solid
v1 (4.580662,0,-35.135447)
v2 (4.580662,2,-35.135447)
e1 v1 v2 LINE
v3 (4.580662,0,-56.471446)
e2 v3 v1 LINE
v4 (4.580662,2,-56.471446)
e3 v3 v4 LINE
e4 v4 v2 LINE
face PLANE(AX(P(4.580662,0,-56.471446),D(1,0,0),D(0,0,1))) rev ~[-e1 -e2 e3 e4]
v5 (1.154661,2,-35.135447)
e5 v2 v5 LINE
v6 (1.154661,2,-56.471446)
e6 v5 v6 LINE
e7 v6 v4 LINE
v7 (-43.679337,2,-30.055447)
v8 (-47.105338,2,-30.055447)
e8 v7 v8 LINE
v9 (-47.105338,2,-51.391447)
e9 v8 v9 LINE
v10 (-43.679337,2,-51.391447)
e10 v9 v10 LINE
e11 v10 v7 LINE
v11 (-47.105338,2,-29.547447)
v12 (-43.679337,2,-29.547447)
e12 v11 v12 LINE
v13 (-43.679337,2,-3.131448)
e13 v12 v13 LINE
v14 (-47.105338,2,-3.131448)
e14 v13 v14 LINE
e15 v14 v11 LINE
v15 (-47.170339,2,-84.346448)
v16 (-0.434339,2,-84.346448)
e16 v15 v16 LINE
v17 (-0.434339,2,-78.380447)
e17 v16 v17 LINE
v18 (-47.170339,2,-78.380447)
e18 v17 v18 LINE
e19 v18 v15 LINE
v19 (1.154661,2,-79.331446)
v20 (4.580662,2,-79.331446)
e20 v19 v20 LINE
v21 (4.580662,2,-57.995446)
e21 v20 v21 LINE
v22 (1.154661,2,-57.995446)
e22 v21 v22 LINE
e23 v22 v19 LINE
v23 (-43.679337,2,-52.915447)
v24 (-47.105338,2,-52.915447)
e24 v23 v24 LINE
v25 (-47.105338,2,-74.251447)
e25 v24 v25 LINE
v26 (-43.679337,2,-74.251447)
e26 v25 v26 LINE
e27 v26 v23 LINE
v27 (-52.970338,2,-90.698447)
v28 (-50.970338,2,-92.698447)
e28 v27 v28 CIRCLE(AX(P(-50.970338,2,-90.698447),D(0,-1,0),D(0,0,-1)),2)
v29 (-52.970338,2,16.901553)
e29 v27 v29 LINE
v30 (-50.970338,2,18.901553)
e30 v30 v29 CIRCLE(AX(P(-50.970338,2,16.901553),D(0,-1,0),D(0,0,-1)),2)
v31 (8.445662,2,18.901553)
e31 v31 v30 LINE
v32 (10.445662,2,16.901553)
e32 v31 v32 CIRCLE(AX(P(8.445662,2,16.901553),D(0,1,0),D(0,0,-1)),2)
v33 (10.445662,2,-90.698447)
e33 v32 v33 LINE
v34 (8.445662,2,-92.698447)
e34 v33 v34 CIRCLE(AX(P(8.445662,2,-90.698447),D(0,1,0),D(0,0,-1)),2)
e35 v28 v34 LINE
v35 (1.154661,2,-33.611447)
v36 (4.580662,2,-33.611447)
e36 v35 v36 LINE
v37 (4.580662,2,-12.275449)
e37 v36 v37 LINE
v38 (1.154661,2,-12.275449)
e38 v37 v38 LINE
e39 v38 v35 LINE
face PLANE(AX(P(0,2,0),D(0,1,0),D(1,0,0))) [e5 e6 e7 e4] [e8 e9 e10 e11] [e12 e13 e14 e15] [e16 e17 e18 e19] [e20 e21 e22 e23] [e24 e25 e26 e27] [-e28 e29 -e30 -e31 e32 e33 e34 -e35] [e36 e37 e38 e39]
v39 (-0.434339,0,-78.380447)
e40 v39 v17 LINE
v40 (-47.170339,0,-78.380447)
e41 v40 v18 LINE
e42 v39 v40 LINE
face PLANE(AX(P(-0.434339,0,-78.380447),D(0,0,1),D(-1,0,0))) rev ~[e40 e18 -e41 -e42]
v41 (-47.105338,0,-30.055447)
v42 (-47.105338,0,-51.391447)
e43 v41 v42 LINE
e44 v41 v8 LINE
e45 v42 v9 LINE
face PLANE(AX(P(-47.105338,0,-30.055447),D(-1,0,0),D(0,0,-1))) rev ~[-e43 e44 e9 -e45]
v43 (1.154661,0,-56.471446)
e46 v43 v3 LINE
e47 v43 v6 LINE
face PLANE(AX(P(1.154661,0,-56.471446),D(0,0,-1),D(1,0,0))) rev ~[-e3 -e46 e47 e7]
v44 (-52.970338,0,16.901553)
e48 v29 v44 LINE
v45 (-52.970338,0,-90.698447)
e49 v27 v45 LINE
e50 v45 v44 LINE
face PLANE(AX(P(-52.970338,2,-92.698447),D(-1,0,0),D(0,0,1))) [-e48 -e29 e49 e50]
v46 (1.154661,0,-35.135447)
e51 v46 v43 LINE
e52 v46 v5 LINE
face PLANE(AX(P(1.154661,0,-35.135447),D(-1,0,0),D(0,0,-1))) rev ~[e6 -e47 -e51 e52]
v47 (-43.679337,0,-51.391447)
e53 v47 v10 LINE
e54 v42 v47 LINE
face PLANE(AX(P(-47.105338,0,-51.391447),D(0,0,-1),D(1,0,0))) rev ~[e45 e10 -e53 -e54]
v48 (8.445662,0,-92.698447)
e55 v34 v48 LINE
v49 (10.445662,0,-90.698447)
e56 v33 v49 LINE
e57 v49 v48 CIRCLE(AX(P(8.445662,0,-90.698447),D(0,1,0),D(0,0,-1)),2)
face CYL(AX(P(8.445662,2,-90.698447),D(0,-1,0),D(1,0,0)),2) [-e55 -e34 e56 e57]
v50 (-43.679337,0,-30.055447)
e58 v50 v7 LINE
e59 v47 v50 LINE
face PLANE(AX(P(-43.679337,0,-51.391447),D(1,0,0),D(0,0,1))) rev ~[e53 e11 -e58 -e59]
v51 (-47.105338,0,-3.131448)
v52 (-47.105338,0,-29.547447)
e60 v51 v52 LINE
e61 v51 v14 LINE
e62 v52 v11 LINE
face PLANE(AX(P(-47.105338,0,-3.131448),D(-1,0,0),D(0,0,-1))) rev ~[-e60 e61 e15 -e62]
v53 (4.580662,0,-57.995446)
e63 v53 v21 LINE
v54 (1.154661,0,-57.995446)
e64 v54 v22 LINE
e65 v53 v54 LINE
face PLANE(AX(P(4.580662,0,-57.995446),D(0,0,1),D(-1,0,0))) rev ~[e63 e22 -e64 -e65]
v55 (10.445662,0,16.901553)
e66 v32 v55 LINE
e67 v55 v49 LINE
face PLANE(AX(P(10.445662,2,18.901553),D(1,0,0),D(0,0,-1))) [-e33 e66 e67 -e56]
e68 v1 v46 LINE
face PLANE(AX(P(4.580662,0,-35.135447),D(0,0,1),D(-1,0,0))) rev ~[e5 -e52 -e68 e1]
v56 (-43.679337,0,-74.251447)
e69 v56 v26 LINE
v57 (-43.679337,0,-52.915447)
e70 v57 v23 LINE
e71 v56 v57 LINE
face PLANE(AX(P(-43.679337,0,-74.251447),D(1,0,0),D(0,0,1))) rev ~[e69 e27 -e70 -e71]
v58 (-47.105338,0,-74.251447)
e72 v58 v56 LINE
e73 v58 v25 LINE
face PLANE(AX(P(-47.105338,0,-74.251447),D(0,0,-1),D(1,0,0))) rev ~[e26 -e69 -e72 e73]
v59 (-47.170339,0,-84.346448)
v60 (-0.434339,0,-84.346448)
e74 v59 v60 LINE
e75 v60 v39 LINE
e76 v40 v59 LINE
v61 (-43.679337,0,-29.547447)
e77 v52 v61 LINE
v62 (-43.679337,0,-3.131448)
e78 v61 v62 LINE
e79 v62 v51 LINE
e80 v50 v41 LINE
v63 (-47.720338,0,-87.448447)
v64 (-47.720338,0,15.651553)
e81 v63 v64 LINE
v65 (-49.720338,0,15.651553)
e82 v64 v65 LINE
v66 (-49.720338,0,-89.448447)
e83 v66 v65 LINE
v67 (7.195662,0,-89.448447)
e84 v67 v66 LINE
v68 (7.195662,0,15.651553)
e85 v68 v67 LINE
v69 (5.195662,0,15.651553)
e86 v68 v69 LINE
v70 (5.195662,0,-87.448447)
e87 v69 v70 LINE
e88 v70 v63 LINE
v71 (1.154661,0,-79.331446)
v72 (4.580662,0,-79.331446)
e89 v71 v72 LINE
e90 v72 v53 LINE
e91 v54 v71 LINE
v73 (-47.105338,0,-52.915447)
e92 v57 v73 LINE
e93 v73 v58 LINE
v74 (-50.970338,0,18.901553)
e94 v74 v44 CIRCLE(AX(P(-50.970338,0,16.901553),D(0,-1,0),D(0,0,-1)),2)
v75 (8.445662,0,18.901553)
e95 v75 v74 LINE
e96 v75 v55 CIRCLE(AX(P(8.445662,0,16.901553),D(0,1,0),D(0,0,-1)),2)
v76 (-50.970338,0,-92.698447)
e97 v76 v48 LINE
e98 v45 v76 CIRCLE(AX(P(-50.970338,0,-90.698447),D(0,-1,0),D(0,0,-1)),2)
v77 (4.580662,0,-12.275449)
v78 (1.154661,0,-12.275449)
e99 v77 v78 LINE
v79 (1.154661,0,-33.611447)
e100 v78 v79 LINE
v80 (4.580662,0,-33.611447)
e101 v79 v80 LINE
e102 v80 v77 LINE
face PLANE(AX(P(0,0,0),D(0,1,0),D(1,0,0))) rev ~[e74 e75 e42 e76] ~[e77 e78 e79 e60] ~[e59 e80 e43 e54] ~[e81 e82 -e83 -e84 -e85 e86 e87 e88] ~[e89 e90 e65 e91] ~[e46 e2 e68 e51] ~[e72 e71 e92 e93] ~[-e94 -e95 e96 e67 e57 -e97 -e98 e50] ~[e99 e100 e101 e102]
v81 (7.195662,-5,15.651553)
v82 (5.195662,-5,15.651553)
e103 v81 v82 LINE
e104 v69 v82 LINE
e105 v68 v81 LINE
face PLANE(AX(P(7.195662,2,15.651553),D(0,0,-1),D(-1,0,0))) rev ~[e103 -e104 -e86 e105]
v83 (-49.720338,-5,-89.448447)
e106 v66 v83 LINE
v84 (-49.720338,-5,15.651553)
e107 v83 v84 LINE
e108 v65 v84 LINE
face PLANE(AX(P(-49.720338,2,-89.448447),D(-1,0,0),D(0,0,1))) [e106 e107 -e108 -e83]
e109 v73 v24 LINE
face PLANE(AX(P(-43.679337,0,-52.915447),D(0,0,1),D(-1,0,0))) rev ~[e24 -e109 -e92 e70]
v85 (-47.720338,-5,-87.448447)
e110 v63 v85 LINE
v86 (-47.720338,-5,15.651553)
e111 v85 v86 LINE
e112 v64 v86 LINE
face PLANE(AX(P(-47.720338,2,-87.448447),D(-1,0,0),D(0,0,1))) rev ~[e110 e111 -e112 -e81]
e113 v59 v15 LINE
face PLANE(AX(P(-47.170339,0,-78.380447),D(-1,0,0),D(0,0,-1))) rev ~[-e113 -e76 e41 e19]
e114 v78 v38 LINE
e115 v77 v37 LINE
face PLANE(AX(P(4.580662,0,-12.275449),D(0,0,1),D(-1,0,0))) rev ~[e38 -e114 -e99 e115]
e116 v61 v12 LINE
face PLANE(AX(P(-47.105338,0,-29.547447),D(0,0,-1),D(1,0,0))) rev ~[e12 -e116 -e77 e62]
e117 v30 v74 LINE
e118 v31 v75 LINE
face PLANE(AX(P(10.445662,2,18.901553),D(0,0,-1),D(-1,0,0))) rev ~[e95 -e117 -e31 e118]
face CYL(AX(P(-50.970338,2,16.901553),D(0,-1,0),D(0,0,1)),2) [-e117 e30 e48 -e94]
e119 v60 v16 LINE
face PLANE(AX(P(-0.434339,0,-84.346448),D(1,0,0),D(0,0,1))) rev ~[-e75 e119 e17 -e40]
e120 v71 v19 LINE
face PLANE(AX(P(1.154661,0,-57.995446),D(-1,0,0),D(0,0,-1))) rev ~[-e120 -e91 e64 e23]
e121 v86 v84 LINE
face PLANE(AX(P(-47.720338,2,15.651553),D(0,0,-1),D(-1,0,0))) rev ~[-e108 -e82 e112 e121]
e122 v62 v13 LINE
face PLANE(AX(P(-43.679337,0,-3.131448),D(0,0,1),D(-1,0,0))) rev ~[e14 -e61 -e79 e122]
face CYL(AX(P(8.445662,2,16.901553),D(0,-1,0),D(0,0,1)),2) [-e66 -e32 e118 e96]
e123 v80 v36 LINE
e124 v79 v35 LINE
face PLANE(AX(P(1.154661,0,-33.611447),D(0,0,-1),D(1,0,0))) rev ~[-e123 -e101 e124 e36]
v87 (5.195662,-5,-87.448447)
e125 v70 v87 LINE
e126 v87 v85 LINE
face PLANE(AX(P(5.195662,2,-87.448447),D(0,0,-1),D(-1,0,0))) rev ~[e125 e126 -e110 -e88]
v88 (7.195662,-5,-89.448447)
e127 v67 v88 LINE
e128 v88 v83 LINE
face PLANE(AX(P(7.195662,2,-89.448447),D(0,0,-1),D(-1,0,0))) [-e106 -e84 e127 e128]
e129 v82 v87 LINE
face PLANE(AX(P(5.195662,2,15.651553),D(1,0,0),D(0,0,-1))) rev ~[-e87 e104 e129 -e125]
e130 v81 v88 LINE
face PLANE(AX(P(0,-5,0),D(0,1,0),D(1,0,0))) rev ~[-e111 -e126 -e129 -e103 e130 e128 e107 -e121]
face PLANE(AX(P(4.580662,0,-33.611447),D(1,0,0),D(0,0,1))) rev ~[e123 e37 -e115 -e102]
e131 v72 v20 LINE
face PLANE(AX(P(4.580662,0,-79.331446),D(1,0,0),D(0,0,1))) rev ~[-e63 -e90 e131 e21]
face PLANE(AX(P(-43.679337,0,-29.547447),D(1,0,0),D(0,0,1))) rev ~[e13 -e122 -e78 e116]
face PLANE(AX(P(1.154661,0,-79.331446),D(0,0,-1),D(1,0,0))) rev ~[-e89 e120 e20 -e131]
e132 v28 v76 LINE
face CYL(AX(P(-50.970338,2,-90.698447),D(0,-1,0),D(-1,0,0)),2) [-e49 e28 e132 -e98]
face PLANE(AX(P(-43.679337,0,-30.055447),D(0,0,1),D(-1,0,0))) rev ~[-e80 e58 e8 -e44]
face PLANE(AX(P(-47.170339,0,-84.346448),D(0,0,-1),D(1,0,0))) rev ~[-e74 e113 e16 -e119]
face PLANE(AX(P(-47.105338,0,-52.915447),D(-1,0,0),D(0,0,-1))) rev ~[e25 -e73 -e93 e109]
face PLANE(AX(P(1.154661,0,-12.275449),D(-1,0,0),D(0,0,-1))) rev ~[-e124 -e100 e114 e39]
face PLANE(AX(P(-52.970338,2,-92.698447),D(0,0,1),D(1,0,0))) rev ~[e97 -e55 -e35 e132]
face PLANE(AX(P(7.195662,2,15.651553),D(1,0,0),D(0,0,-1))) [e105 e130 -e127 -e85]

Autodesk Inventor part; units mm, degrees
ref_plane "YZ Plane" through (0, 0, 0) normal (1, 0, 0) x (0, 1, 0)
ref_plane "XZ Plane" through (0, 0, 0) normal (0, 1, 0) x (-1, 0, 0)
ref_plane "XY Plane" through (0, 0, 0) normal (0, 0, 1) x (1, 0, 0)
sketch "Náčrt1" plane through (0, 0, 0) normal (0, 1, 0) x (-1, 0, 0)
  line L0 (-6.677663, 17.076554) -> (49.20234, 17.076554)
  line L1 (-9.217661, 14.536556) -> (-9.217661, -88.33345)
  line L2 (-6.677663, -90.873447) -> (49.20234, -90.873447)
  line L3 (51.742337, 14.536556) -> (51.742337, -88.33345)
  line L4 (47.105338, -3.131448) -> (47.105338, -74.251447)
  line L5 (43.679337, -3.131448) -> (47.105338, -3.131448)
  line L6 (43.679337, -29.547447) -> (43.679337, -3.131448)
  line L7 (43.679337, -29.547447) -> (47.105338, -29.547447)
  line L8 (43.679337, -30.055447) -> (47.105338, -30.055447)
  line L9 (43.679337, -51.391447) -> (43.679337, -30.055447)
  line L10 (47.105338, -51.391447) -> (43.679337, -51.391447)
  line L11 (43.679337, -52.915447) -> (47.105338, -52.915447)
  line L12 (43.679337, -74.251447) -> (43.679337, -52.915447)
  line L13 (47.105338, -74.251447) -> (43.679337, -74.251447)
  line L14 (0.434339, -78.380447) -> (47.170339, -78.380447)
  line L15 (47.170339, -84.346448) -> (47.170339, -78.380447)
  line L16 (47.170339, -84.346448) -> (0.434339, -84.346448)
  line L17 (0.434339, -84.346448) -> (0.434339, -78.380447)
  line L18 (-1.154661, -57.995446) -> (-1.154661, -79.331446)
  line L19 (-4.580662, -79.331446) -> (-4.580662, -12.275449)
  line L20 (-1.154661, -79.331446) -> (-4.580662, -79.331446)
  line L21 (-4.580662, -57.995446) -> (-1.154661, -57.995446)
  line L22 (-1.154661, -56.471446) -> (-4.580662, -56.471446)
  line L23 (-1.154661, -35.135447) -> (-1.154661, -56.471446)
  line L24 (-4.580662, -35.135447) -> (-1.154661, -35.135447)
  line L25 (-1.154661, -33.611447) -> (-4.580662, -33.611447)
  line L26 (-1.154661, -12.275449) -> (-1.154661, -33.611447)
  line L27 (-4.580662, -12.275449) -> (-1.154661, -12.275449)
  circle A0 centre (-6.686866, -88.348377) radius 2.522363
  circle A1 centre (49.198008, -88.332369) radius 2.54409
  circle A2 centre (49.211542, 14.551484) radius 2.522363
  circle A3 centre (-6.692632, 14.545779) radius 2.522319
  line L28 (51.742337, 17.076554) -> (-9.217661, 17.076554)
  line L29 (-9.217661, 17.076554) -> (-9.217661, -90.873447)
  line L30 (-9.217661, -90.873447) -> (51.742337, -90.873447)
  line L31 (51.742337, -90.873447) -> (51.742337, 17.076554)
  line L32 (-1.154661, -12.275449) -> (-4.580662, -12.275449)
  line L33 (-4.580662, -12.275449) -> (-4.580662, -33.611447)
  line L34 (-4.580662, -33.611447) -> (-1.154661, -33.611447)
  line L35 (-1.154661, -33.611447) -> (-1.154661, -12.275449)
  line L36 (-4.580662, -35.135447) -> (-1.154661, -35.135447)
  line L37 (-1.154661, -35.135447) -> (-1.154661, -56.471446)
  line L38 (-1.154661, -56.471446) -> (-4.580662, -56.471446)
  line L39 (-4.580662, -56.471446) -> (-4.580662, -35.135447)
  line L40 (-4.580662, -57.995446) -> (-1.154661, -57.995446)
  line L41 (-1.154661, -57.995446) -> (-1.154661, -79.331446)
  line L42 (-1.154661, -79.331446) -> (-4.580662, -79.331446)
  line L43 (-4.580662, -79.331446) -> (-4.580662, -57.995446)
  line L44 (0.434339, -84.346448) -> (47.170339, -84.346448)
  line L45 (47.170339, -84.346448) -> (47.170339, -78.380447)
  line L46 (47.170339, -78.380447) -> (0.434339, -78.380447)
  line L47 (0.434339, -78.380447) -> (0.434339, -84.346448)
  line L48 (43.679337, -74.251447) -> (47.105338, -74.251447)
  line L49 (47.105338, -74.251447) -> (47.105338, -52.915447)
  line L50 (47.105338, -52.915447) -> (43.679337, -52.915447)
  line L51 (43.679337, -52.915447) -> (43.679337, -74.251447)
  line L52 (47.105338, -30.055447) -> (43.679337, -30.055447)
  line L53 (43.679337, -30.055447) -> (43.679337, -51.391447)
  line L54 (43.679337, -51.391447) -> (47.105338, -51.391447)
  line L55 (47.105338, -51.391447) -> (47.105338, -30.055447)
  line L56 (43.679337, -29.547447) -> (47.105338, -29.547447)
  line L57 (47.105338, -29.547447) -> (47.105338, -3.131448)
  line L58 (47.105338, -3.131448) -> (43.679337, -3.131448)
  line L59 (43.679337, -3.131448) -> (43.679337, -29.547447)
  point P0 (0, 0)
  dimension "d0" = 0
  dimension "d1" = 0
  dimension "d2" = 0
  dimension "d3" = 0
sketch "Náčrt1 outline for Vysunutí1" plane through (0, 0, 0) normal (0, 1, 0) x (-1, 0, 0)
  line L0 (51.742337, 14.536556) -> (51.742337, 17.076554)
  line L1 (51.742337, -88.33345) -> (51.742337, 14.536556)
  line L2 (51.742337, 17.076554) -> (49.20234, 17.076554)
  line L3 (51.742337, -90.873447) -> (51.742337, -88.33345)
  line L4 (49.20234, 17.076554) -> (-6.677663, 17.076554)
  line L5 (49.20234, -90.873447) -> (51.742337, -90.873447)
  line L6 (-6.677663, 17.076554) -> (-9.217661, 17.076554)
  line L7 (-6.677663, -90.873447) -> (49.20234, -90.873447)
  line L8 (-9.217661, 17.076554) -> (-9.217661, 14.536556)
  line L9 (-9.217661, -90.873447) -> (-6.677663, -90.873447)
  line L10 (-9.217661, 14.536556) -> (-9.217661, -88.33345)
  line L11 (-9.217661, -88.33345) -> (-9.217661, -90.873447)
  line L12 (-4.580662, -57.995446) -> (-1.154661, -57.995446)
  line L13 (-4.580662, -79.331446) -> (-4.580662, -57.995446)
  line L14 (-1.154661, -79.331446) -> (-4.580662, -79.331446)
  line L15 (-1.154661, -57.995446) -> (-1.154661, -79.331446)
  line L16 (-4.580662, -56.471446) -> (-4.580662, -35.135447)
  line L17 (-1.154661, -56.471446) -> (-4.580662, -56.471446)
  line L18 (-1.154661, -35.135447) -> (-1.154661, -56.471446)
  line L19 (-4.580662, -35.135447) -> (-1.154661, -35.135447)
  line L20 (0.434339, -84.346448) -> (0.434339, -78.380447)
  line L21 (47.170339, -84.346448) -> (0.434339, -84.346448)
  line L22 (47.170339, -78.380447) -> (47.170339, -84.346448)
  line L23 (0.434339, -78.380447) -> (47.170339, -78.380447)
  line L24 (47.105338, -52.915447) -> (47.105338, -74.251447)
  line L25 (43.679337, -52.915447) -> (47.105338, -52.915447)
  line L26 (43.679337, -74.251447) -> (43.679337, -52.915447)
  line L27 (47.105338, -74.251447) -> (43.679337, -74.251447)
  line L28 (-4.580662, -33.611447) -> (-4.580662, -12.275449)
  line L29 (-1.154661, -33.611447) -> (-4.580662, -33.611447)
  line L30 (-1.154661, -12.275449) -> (-1.154661, -33.611447)
  line L31 (-4.580662, -12.275449) -> (-1.154661, -12.275449)
  line L32 (47.105338, -30.055447) -> (47.105338, -51.391447)
  line L33 (43.679337, -30.055447) -> (47.105338, -30.055447)
  line L34 (43.679337, -51.391447) -> (43.679337, -30.055447)
  line L35 (47.105338, -51.391447) -> (43.679337, -51.391447)
  line L36 (47.105338, -29.547447) -> (43.679337, -29.547447)
  line L37 (47.105338, -3.131448) -> (47.105338, -29.547447)
  line L38 (43.679337, -3.131448) -> (47.105338, -3.131448)
  line L39 (43.679337, -29.547447) -> (43.679337, -3.131448)
extrude "Vysunutí1" add sketch "Náčrt1 outline for Vysunutí1" along normal blind 2
sketch "Náčrt2" plane through (0, 2, 0) normal (0, 1, 0) x (1, 0, 0)
  line L0 (-51.742337, -17.076554) -> (9.217661, -17.076554)
  line L1 (9.217661, -17.076554) -> (9.217661, 90.873447)
  line L2 (9.217661, 90.873447) -> (-51.742337, 90.873447)
  line L3 (-51.742337, 90.873447) -> (-51.742337, -17.076554)
  line L4 (-47.105338, 29.547447) -> (-43.679337, 29.547447)
  line L5 (-43.679337, 29.547447) -> (-43.679337, 3.131448)
  line L6 (-43.679337, 3.131448) -> (-47.105338, 3.131448)
  line L7 (-47.105338, 3.131448) -> (-47.105338, 29.547447)
  line L8 (-47.105338, 30.055447) -> (-47.105338, 51.391447)
  line L9 (-47.105338, 51.391447) -> (-43.679337, 51.391447)
  line L10 (-43.679337, 51.391447) -> (-43.679337, 30.055447)
  line L11 (-43.679337, 30.055447) -> (-47.105338, 30.055447)
  line L12 (4.580662, 57.995446) -> (1.154661, 57.995446)
  line L13 (1.154661, 57.995446) -> (1.154661, 79.331446)
  line L14 (1.154661, 79.331446) -> (4.580662, 79.331446)
  line L15 (4.580662, 79.331446) -> (4.580662, 57.995446)
  line L16 (4.580662, 56.471446) -> (4.580662, 35.135447)
  line L17 (4.580662, 35.135447) -> (1.154661, 35.135447)
  line L18 (1.154661, 35.135447) -> (1.154661, 56.471446)
  line L19 (1.154661, 56.471446) -> (4.580662, 56.471446)
  line L20 (4.580662, 33.611447) -> (4.580662, 12.275449)
  line L21 (4.580662, 12.275449) -> (1.154661, 12.275449)
  line L22 (1.154661, 12.275449) -> (1.154661, 33.611447)
  line L23 (1.154661, 33.611447) -> (4.580662, 33.611447)
  line L24 (-0.434339, 84.346448) -> (-0.434339, 78.380447)
  line L25 (-0.434339, 78.380447) -> (-47.170339, 78.380447)
  line L26 (-47.170339, 78.380447) -> (-47.170339, 84.346448)
  line L27 (-47.170339, 84.346448) -> (-0.434339, 84.346448)
  line L28 (-47.105338, 52.915447) -> (-47.105338, 74.251447)
  line L29 (-47.105338, 74.251447) -> (-43.679337, 74.251447)
  line L30 (-43.679337, 74.251447) -> (-43.679337, 52.915447)
  line L31 (-43.679337, 52.915447) -> (-47.105338, 52.915447)
  line L32 (-52.742337, -18.076554) -> (10.217661, -18.076554)
  line L33 (10.217661, -18.076554) -> (10.217661, 91.873447)
  line L34 (10.217661, 91.873447) -> (-52.742337, 91.873447)
  line L35 (-52.742337, 91.873447) -> (-52.742337, -18.076554)
  point P0 (0, 0)
  dimension "d6" = 1
extrude "Vysunutí2" add sketch "Náčrt2" against normal up to surface (2 mm away) contours L35 L34 L33 L32
sketch "Náčrt3" plane through (0, 2, 0) normal (0, 1, 0) x (1, 0, 0)
  line L0 (10.217661, -18.076554) -> (10.217661, 91.873447)
  line L1 (10.217661, 91.873447) -> (-52.742337, 91.873447)
  line L2 (-52.742337, 91.873447) -> (-52.742337, -18.076554)
  line L3 (-52.742337, -18.076554) -> (10.217661, -18.076554)
  line L4 (-47.105338, 29.547447) -> (-43.679337, 29.547447)
  line L5 (-43.679337, 29.547447) -> (-43.679337, 3.131448)
  line L6 (-43.679337, 3.131448) -> (-47.105338, 3.131448)
  line L7 (-47.105338, 3.131448) -> (-47.105338, 29.547447)
  line L8 (-47.105338, 30.055447) -> (-47.105338, 51.391447)
  line L9 (-47.105338, 51.391447) -> (-43.679337, 51.391447)
  line L10 (-43.679337, 51.391447) -> (-43.679337, 30.055447)
  line L11 (-43.679337, 30.055447) -> (-47.105338, 30.055447)
  line L12 (4.580662, 57.995446) -> (1.154661, 57.995446)
  line L13 (1.154661, 57.995446) -> (1.154661, 79.331446)
  line L14 (1.154661, 79.331446) -> (4.580662, 79.331446)
  line L15 (4.580662, 79.331446) -> (4.580662, 57.995446)
  line L16 (4.580662, 56.471446) -> (4.580662, 35.135447)
  line L17 (4.580662, 35.135447) -> (1.154661, 35.135447)
  line L18 (1.154661, 35.135447) -> (1.154661, 56.471446)
  line L19 (1.154661, 56.471446) -> (4.580662, 56.471446)
  line L20 (4.580662, 33.611447) -> (4.580662, 12.275449)
  line L21 (4.580662, 12.275449) -> (1.154661, 12.275449)
  line L22 (1.154661, 12.275449) -> (1.154661, 33.611447)
  line L23 (1.154661, 33.611447) -> (4.580662, 33.611447)
  line L24 (-0.434339, 84.346448) -> (-0.434339, 78.380447)
  line L25 (-0.434339, 78.380447) -> (-47.170339, 78.380447)
  line L26 (-47.170339, 78.380447) -> (-47.170339, 84.346448)
  line L27 (-47.170339, 84.346448) -> (-0.434339, 84.346448)
  line L28 (-47.105338, 52.915447) -> (-47.105338, 74.251447)
  line L29 (-47.105338, 74.251447) -> (-43.679337, 74.251447)
  line L30 (-43.679337, 74.251447) -> (-43.679337, 52.915447)
  line L31 (-43.679337, 52.915447) -> (-47.105338, 52.915447)
  line L32 (10.445662, -18.901553) -> (-52.970338, -18.901553)
  line L33 (-52.970338, 92.698447) -> (10.445662, 92.698447)
  line L34 (-52.970338, 92.698447) -> (-52.970338, -18.901553)
  line L35 (10.445662, -18.901553) -> (10.445662, 92.698447)
  line L36 (10.217661, 91.873447) -> (-52.742337, 91.873447)
  line L37 (-21.262338, 91.873447) -> (-21.262338, -18.076554) construction
  line L38 (10.217661, -18.076554) -> (10.217661, 91.873447)
  line L39 (10.217661, 36.898447) -> (-52.742337, 36.898447) construction
  point P0 (0, 0)
  dimension "d10" = 111.6
  dimension "d11" = 63.416
extrude "Vysunutí3" add sketch "Náčrt3" against normal up to surface (2 mm away) contours L32 L34 L33 L35
fillet "Zaoblení1" radius 2 4 edges at (10.4457, 1, -92.6984) (-52.9703, 1, -92.6984) (-52.9703, 1, 18.9016) (10.4457, 1, 18.9016)
sketch "Náčrt4" plane through (0, 2, 0) normal (0, 1, 0) x (1, 0, 0)
  arc A0 (8.445662, -18.901553) -> (10.445662, -16.901553) centre (8.445662, -16.901553) ccw
  line L0 (10.445662, -16.901553) -> (10.445662, 90.698447)
  arc A1 (10.445662, 90.698447) -> (8.445662, 92.698447) centre (8.445662, 90.698447) ccw
  line L1 (8.445662, 92.698447) -> (-50.970338, 92.698447)
  arc A2 (-50.970338, 92.698447) -> (-52.970338, 90.698447) centre (-50.970338, 90.698447) ccw
  line L2 (-52.970338, 90.698447) -> (-52.970338, -16.901553)
  arc A3 (-52.970338, -16.901553) -> (-50.970338, -18.901553) centre (-50.970338, -16.901553) ccw
  line L3 (-50.970338, -18.901553) -> (8.445662, -18.901553)
  line L4 (-47.105338, 29.547447) -> (-43.679337, 29.547447)
  line L5 (-43.679337, 29.547447) -> (-43.679337, 3.131448)
  line L6 (-43.679337, 3.131448) -> (-47.105338, 3.131448)
  line L7 (-47.105338, 3.131448) -> (-47.105338, 29.547447)
  line L8 (-47.105338, 30.055447) -> (-47.105338, 51.391447)
  line L9 (-47.105338, 51.391447) -> (-43.679337, 51.391447)
  line L10 (-43.679337, 51.391447) -> (-43.679337, 30.055447)
  line L11 (-43.679337, 30.055447) -> (-47.105338, 30.055447)
  line L12 (4.580662, 57.995446) -> (1.154661, 57.995446)
  line L13 (1.154661, 57.995446) -> (1.154661, 79.331446)
  line L14 (1.154661, 79.331446) -> (4.580662, 79.331446)
  line L15 (4.580662, 79.331446) -> (4.580662, 57.995446)
  line L16 (4.580662, 56.471446) -> (4.580662, 35.135447)
  line L17 (4.580662, 35.135447) -> (1.154661, 35.135447)
  line L18 (1.154661, 35.135447) -> (1.154661, 56.471446)
  line L19 (1.154661, 56.471446) -> (4.580662, 56.471446)
  line L20 (4.580662, 33.611447) -> (4.580662, 12.275449)
  line L21 (4.580662, 12.275449) -> (1.154661, 12.275449)
  line L22 (1.154661, 12.275449) -> (1.154661, 33.611447)
  line L23 (1.154661, 33.611447) -> (4.580662, 33.611447)
  line L24 (-0.434339, 84.346448) -> (-0.434339, 78.380447)
  line L25 (-0.434339, 78.380447) -> (-47.170339, 78.380447)
  line L26 (-47.170339, 78.380447) -> (-47.170339, 84.346448)
  line L27 (-47.170339, 84.346448) -> (-0.434339, 84.346448)
  line L28 (-47.105338, 52.915447) -> (-47.105338, 74.251447)
  line L29 (-47.105338, 74.251447) -> (-43.679337, 74.251447)
  line L30 (-43.679337, 74.251447) -> (-43.679337, 52.915447)
  line L31 (-43.679337, 52.915447) -> (-47.105338, 52.915447)
  line L32 (7.195662, -15.651553) -> (7.195662, 89.448447)
  line L33 (7.195662, 89.448447) -> (-49.720338, 89.448447)
  line L34 (-49.720338, 89.448447) -> (-49.720338, -15.651553)
  line L35 (5.195662, -15.651553) -> (5.195662, 87.448447)
  line L36 (5.195662, 87.448447) -> (-47.720338, 87.448447)
  line L37 (-47.720338, 87.448447) -> (-47.720338, -15.651553)
  line L38 (7.195662, -15.651553) -> (5.195662, -15.651553)
  line L39 (-47.720338, -15.651553) -> (-49.720338, -15.651553)
  point P0 (0, 0)
  dimension "d17" = 2
  dimension "d18" = 2
  dimension "d19" = 3.25
  dimension "d20" = 2
extrude "Vysunutí4" add sketch "Náčrt4" against normal blind 7 contours L38 L35 L36 L37 L39 L34 L33 L32
properties part number "arduino_lid_3D tisk"
